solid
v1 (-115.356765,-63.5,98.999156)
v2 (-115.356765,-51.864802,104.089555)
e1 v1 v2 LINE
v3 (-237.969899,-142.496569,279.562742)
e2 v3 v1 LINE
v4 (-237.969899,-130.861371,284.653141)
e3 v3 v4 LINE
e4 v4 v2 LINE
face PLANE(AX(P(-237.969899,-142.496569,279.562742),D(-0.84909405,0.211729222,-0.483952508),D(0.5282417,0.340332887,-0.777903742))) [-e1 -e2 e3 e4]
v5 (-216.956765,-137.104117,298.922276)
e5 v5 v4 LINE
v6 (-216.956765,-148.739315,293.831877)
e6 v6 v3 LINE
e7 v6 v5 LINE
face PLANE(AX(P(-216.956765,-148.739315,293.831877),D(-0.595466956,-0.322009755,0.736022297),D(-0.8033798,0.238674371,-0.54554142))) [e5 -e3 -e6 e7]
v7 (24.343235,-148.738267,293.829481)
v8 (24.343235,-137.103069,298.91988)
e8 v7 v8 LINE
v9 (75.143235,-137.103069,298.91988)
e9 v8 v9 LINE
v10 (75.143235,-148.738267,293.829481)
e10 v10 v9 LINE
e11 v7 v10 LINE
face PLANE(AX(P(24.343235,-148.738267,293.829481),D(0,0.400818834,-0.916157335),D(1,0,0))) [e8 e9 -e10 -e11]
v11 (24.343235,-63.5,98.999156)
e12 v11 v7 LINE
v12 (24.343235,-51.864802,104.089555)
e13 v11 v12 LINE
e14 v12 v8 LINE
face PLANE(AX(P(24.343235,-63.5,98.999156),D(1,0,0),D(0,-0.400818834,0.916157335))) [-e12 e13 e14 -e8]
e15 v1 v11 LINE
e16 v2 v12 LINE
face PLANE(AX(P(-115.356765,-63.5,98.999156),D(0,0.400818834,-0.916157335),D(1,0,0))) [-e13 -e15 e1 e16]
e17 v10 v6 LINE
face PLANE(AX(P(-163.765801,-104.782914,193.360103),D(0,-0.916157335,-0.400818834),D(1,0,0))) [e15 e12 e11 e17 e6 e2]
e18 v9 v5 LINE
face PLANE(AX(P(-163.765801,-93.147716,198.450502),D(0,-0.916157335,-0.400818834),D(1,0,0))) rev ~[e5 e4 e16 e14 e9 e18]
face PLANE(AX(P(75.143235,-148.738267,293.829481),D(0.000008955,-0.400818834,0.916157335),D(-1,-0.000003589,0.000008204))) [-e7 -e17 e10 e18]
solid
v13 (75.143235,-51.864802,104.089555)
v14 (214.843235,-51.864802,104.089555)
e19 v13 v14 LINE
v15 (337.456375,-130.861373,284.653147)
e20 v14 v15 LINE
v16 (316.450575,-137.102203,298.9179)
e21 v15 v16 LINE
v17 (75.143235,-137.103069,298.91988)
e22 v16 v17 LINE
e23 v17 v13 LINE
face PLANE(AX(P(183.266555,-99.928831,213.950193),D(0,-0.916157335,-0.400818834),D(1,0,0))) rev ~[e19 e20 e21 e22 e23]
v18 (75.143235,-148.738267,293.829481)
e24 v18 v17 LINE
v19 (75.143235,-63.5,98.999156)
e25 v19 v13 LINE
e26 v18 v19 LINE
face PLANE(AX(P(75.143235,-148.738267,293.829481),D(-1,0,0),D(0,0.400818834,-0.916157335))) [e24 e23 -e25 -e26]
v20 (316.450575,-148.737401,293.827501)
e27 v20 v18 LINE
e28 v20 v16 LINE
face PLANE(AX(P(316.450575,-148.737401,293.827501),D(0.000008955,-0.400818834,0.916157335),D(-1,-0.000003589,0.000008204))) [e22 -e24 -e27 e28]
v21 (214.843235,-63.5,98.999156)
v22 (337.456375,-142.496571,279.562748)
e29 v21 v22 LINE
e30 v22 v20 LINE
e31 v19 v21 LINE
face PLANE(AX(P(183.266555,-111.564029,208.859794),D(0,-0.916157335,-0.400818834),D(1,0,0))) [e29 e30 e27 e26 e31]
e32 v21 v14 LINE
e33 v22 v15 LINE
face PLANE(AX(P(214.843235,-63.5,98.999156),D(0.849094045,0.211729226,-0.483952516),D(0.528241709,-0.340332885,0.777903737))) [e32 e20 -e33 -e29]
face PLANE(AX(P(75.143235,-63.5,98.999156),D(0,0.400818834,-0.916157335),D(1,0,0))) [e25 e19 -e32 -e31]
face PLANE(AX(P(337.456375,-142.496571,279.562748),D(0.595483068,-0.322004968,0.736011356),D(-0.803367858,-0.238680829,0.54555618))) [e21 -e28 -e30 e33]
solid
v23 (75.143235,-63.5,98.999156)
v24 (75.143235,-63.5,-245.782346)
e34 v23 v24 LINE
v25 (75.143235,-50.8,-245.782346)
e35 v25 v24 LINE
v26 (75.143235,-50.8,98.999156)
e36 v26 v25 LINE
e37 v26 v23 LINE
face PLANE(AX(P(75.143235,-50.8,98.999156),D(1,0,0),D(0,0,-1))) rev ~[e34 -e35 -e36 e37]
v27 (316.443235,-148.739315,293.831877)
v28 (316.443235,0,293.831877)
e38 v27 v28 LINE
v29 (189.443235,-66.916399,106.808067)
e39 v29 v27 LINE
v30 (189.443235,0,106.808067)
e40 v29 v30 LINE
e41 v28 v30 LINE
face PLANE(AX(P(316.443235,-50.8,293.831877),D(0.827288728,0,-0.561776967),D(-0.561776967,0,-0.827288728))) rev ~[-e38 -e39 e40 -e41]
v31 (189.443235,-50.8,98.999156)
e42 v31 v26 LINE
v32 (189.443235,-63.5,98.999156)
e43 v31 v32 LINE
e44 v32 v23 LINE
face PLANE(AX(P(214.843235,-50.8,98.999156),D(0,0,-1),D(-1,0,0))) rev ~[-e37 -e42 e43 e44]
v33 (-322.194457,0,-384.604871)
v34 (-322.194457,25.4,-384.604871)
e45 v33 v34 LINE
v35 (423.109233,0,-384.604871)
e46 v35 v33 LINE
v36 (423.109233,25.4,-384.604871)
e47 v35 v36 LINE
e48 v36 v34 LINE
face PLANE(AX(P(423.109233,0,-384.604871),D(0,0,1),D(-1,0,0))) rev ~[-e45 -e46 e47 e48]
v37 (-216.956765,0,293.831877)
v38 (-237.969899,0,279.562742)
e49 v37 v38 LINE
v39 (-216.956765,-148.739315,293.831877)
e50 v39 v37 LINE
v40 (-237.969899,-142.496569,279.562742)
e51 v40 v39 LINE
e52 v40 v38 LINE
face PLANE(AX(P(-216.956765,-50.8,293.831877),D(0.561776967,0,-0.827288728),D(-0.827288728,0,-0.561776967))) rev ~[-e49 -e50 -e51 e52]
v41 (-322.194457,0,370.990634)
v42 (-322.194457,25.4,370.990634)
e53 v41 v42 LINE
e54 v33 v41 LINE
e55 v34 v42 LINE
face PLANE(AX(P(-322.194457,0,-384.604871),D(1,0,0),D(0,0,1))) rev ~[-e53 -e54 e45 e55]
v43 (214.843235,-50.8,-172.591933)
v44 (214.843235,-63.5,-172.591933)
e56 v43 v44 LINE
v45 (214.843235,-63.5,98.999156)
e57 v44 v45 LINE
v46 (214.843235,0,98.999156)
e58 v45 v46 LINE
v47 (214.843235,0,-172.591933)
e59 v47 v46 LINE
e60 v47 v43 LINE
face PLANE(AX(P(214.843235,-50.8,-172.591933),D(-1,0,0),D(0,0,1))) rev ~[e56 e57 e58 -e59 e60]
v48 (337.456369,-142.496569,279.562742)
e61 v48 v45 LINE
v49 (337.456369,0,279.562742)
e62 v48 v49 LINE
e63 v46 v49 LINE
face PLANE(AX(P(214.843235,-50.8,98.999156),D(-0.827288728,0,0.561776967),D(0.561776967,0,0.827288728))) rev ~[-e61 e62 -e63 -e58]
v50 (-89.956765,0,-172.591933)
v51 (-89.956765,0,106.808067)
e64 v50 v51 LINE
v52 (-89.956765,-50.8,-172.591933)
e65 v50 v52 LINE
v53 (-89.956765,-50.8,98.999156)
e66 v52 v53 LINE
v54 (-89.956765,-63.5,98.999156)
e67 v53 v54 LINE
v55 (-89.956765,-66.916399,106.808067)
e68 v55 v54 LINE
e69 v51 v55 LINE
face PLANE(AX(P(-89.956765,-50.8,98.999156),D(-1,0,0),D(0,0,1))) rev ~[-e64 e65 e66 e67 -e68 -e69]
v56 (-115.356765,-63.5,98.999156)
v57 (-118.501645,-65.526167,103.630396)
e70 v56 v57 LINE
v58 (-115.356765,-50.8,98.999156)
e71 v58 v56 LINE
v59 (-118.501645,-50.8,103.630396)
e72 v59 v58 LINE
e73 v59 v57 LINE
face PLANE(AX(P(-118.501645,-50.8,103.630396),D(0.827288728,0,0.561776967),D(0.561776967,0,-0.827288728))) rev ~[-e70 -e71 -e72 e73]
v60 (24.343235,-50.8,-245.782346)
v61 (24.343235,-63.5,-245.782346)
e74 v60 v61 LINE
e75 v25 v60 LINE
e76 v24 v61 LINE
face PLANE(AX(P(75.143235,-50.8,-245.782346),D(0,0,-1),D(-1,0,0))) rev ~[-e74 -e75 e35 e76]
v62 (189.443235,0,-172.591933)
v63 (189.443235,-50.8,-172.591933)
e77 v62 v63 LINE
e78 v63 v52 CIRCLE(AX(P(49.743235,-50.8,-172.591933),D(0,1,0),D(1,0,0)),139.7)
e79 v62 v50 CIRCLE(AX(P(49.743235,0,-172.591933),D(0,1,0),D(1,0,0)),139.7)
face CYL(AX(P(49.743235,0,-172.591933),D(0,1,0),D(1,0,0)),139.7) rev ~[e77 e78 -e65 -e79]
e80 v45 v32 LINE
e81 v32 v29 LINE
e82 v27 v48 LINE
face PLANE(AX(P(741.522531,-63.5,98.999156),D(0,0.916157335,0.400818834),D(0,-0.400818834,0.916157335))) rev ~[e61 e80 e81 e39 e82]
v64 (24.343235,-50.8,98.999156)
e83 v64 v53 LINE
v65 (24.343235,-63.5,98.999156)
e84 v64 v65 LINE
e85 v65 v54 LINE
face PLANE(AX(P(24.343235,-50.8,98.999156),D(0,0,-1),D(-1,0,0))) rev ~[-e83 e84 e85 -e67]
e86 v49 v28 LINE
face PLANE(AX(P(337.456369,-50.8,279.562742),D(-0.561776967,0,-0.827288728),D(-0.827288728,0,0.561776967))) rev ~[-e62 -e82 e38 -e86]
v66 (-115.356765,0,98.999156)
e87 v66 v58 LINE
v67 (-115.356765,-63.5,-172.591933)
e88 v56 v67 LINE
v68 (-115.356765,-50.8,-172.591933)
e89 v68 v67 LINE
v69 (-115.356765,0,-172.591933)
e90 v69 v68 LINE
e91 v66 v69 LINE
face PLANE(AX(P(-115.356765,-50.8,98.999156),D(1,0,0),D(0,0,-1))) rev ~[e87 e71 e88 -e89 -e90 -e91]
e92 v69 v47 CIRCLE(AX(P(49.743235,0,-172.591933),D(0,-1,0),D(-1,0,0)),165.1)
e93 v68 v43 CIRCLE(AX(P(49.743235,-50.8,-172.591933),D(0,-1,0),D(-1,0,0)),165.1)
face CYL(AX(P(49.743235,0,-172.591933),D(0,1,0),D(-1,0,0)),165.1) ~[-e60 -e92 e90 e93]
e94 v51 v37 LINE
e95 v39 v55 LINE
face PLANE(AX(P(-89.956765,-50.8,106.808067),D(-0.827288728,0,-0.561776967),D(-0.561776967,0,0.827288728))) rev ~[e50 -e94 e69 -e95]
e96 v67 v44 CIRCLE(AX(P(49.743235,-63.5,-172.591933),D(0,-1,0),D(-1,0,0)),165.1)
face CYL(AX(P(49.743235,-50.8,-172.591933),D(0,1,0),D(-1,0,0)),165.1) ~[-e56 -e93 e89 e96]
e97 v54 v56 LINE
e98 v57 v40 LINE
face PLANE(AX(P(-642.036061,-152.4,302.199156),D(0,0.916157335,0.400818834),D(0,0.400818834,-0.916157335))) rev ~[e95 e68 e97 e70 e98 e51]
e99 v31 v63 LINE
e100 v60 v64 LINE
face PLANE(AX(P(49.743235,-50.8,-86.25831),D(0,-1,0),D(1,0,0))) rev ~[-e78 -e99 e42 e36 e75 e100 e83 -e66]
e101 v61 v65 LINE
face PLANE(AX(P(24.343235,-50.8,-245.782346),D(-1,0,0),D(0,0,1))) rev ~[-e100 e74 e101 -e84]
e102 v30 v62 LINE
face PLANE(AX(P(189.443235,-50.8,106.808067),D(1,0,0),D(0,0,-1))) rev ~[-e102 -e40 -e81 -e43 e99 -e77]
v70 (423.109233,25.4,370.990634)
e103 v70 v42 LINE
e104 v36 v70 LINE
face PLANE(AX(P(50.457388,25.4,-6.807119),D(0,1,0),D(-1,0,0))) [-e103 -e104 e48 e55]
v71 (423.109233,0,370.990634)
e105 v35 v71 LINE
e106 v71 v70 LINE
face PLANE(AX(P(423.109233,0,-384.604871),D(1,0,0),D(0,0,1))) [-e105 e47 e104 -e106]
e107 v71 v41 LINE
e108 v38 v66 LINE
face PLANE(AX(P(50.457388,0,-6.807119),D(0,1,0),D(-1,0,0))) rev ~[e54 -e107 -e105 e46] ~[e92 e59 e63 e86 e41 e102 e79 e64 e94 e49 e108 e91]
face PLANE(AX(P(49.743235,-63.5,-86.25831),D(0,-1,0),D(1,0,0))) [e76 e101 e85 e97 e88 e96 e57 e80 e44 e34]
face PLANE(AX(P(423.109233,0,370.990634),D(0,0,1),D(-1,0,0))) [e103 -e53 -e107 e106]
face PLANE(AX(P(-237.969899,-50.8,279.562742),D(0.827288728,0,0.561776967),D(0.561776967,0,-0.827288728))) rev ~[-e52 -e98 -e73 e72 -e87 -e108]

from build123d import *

# Parameters (mm, degrees)
F1_DEPTH     = 50.8
F2_W         = 745.3036904335
F2_H         = 755.5955052376
F3_DEPTH     = 25.4
F5_DEPTH     = 12.7
F7_DEPTH     = 101.6
F8_T4_DEPTH  = 1078.7585913979
F9_DEPTH     = 101.6
F10_T4_DEPTH = 1078.7585913979
F12_DEPTH    = 12.7


# Not quite as in the source:
# - a fillet or chamfer that OpenCascade refuses, or shapes differently, is made with other operations: its cross-section is extruded or revolved along the edge and cut away or added


with BuildPart() as f1:
    # F0 (on Front) → F1 (new body)
    with BuildSketch(Plane.XZ):
        with BuildLine():
            Line((-89.9567651826, 106.8080672332), (-216.9567651826, 293.8318768854))
            Line((-216.9567651826, 293.8318768854), (-237.969898878, 279.5627419326))
            Line((-237.969898878, 279.5627419326), (-216.9567651826, 248.6182040079))
            Line((-216.9567651826, 248.6182040079), (-115.3567651826, 98.9991562862))
            Line((-115.3567651826, 98.9991562862), (-115.3567651826, -172.5919327668))
            ThreePointArc((-115.3567651826, -172.5919327668), (-67.0000946798, -289.3352624173), (49.7432350342, -337.6919327668))
            ThreePointArc((49.7432350342, -337.6919327668), (166.486564468, -289.335262264), (214.8432348174, -172.5919327668))
            Line((214.8432348174, -172.5919327668), (214.8432348174, 98.9991562862))
            Line((214.8432348174, 98.9991562862), (316.4432348174, 248.6182040079))
            Line((316.4432348174, 248.6182040079), (337.4563685128, 279.5627419326))
            Line((337.4563685128, 279.5627419326), (316.4432348174, 293.8318768854))
            Line((316.4432348174, 293.8318768854), (189.4432348174, 106.8080672332))
            Line((189.4432348174, 106.8080672332), (189.4432348174, -172.5919327668))
            ThreePointArc((189.4432348174, -172.5919327668), (49.7432348174, -312.2919327668), (-89.9567651826, -172.5919327668))
            Line((-89.9567651826, -172.5919327668), (-89.9567651826, 106.8080672332))
        make_face()
    extrude(amount=F1_DEPTH)

    # F2 (on face) → F3 (join)
    with BuildSketch(Plane(origin=(0, 0, 0), x_dir=(-1, 0, 0), z_dir=(0, 1, 0))):
        with Locations((-50.4573881626, -6.8071186543)):
            Rectangle(F2_W, F2_H)
        with BuildLine():
            Line((89.9567651826, 106.8080672332), (216.9567651826, 293.8318768854))
            Line((216.9567651826, 293.8318768854), (237.969898878, 279.5627419326))
            Line((237.969898878, 279.5627419326), (115.3567651826, 98.9991562862))
            Line((115.3567651826, 98.9991562862), (115.3567651826, -172.5919327668))
            ThreePointArc((115.3567651826, -172.5919327668), (-49.7432348174, -337.6919327668), (-214.8432348174, -172.5919327668))
            Line((-214.8432348174, -172.5919327668), (-214.8432348174, 98.9991562862))
            Line((-214.8432348174, 98.9991562862), (-337.4563685128, 279.5627419326))
            Line((-337.4563685128, 279.5627419326), (-316.4432348174, 293.8318768854))
            Line((-316.4432348174, 293.8318768854), (-189.4432348174, 106.8080672332))
            Line((-189.4432348174, 106.8080672332), (-189.4432348174, -172.5919327668))
            ThreePointArc((-189.4432348174, -172.5919327668), (-49.7432348174, -312.2919327668), (89.9567651826, -172.5919327668))
            Line((89.9567651826, -172.5919327668), (89.9567651826, 106.8080672332))
        make_face(mode=Mode.SUBTRACT)
        with BuildLine():
            Line((237.969898878, 279.5627419326), (216.9567651826, 293.8318768854))
            Line((216.9567651826, 293.8318768854), (89.9567651826, 106.8080672332))
            Line((89.9567651826, 106.8080672332), (89.9567651826, -172.5919327668))
            ThreePointArc((89.9567651826, -172.5919327668), (-49.7432348174, -312.2919327668), (-189.4432348174, -172.5919327668))
            Line((-189.4432348174, -172.5919327668), (-189.4432348174, 106.8080672332))
            Line((-189.4432348174, 106.8080672332), (-316.4432348174, 293.8318768854))
            Line((-316.4432348174, 293.8318768854), (-337.4563685128, 279.5627419326))
            Line((-337.4563685128, 279.5627419326), (-214.8432348174, 98.9991562862))
            Line((-214.8432348174, 98.9991562862), (-214.8432348174, -172.5919327668))
            ThreePointArc((-214.8432348174, -172.5919327668), (-49.7432348174, -337.6919327668), (115.3567651826, -172.5919327668))
            Line((115.3567651826, -172.5919327668), (115.3567651826, 98.9991562862))
            Line((115.3567651826, 98.9991562862), (237.969898878, 279.5627419326))
        make_face()
    extrude(amount=F3_DEPTH)

    # F4 (on face) → F5 (join)
    with BuildSketch(Plane.XZ.offset(50.8)):
        with BuildLine():
            Line((24.3432348174, 98.9991562862), (-89.9567651826, 98.9991562862))
            Line((-89.9567651826, 98.9991562862), (-89.9567651826, -172.5919327668))
            ThreePointArc((-89.9567651826, -172.5919327668), (49.7432348174, -312.2919327668), (189.4432348174, -172.5919327668))
            Line((189.4432348174, -172.5919327668), (189.4432348174, 98.9991562862))
            Line((189.4432348174, 98.9991562862), (75.1432348174, 98.9991562862))
            Line((75.1432348174, 98.9991562862), (75.1432348174, -172.5919327668))
            Line((75.1432348174, -172.5919327668), (75.1432348174, -245.7823455334))
            Line((75.1432348174, -245.7823455334), (24.3432348174, -245.7823455334))
            Line((24.3432348174, -245.7823455334), (24.3432348174, -172.5919327668))
            Line((24.3432348174, -172.5919327668), (24.3432348174, 98.9991562862))
        make_face()
        with BuildLine():
            Line((-89.9567651826, -172.5919327668), (-89.9567651826, 98.9991562862))
            Line((-89.9567651826, 98.9991562862), (-115.3567651826, 98.9991562862))
            Line((-115.3567651826, 98.9991562862), (-115.3567651826, -172.5919327668))
            ThreePointArc((-115.3567651826, -172.5919327668), (49.7432348174, -337.6919327668), (214.8432348174, -172.5919327668))
            Line((214.8432348174, -172.5919327668), (214.8432348174, 98.9991562862))
            Line((214.8432348174, 98.9991562862), (189.4432348174, 98.9991562862))
            Line((189.4432348174, 98.9991562862), (189.4432348174, -172.5919327668))
            ThreePointArc((189.4432348174, -172.5919327668), (49.7432348174, -312.2919327668), (-89.9567651826, -172.5919327668))
        make_face()
    extrude(amount=F5_DEPTH)

    # F6 (on face) → F7 (join)
    with BuildSketch(Plane.XZ.offset(50.8)):
        Polygon((-118.501645235, 103.6303960366), (-115.3567651826, 98.9991562862), (-89.9567651826, 98.9991562862), (-89.9567651826, 106.8080672332), (-216.9567651826, 293.8318768854), (-237.969898878, 279.5627419326), align=None)
    extrude(amount=F7_DEPTH)

    # F8: chamfer of 88.9 x 203.2 on 1 edges, made by hand


with BuildPart() as f8_tool2:
    # F8_s3 → F8_t4 (new body)
    with BuildSketch(Plane.YZ.offset(-642.0360608816)):
        Polygon((-152.4, 302.1991562862), (-63.5, 98.9991562862), (-152.4, 98.9991562862), align=None)
    extrude(amount=F8_T4_DEPTH)

    split(bisect_by=Plane.XZ.offset(63.5), keep=Keep.TOP)


with BuildPart() as f1_1:
    add(f1.part)

    # F8_t1: cut F8_tool2
    add(f8_tool2.part, mode=Mode.SUBTRACT)

    # F9 (add): a face of the model
    f9_faces = [f1_1.faces().sort_by_distance(p)[0] for p in [
        (263.3288281635, -50.8, 193.2225963664),
    ]]
    extrude(f9_faces, amount=F9_DEPTH)

    # F10: chamfer of 203.2 x 88.9 on 1 edges, made by hand


with BuildPart() as f10_tool2:
    # F10_s3 → F10_t4 (new body)
    with BuildSketch(Plane.YZ.offset(741.5225305163)):
        Polygon((-63.5, 98.9991562862), (-152.4, 302.1991562862), (-152.4, 98.9991562862), align=None)
    extrude(amount=-F10_T4_DEPTH)

    split(bisect_by=Plane.XZ.offset(63.5), keep=Keep.TOP)


with BuildPart() as f1_2:
    add(f1_1.part)

    # F10_t1: cut F10_tool2
    add(f10_tool2.part, mode=Mode.SUBTRACT)


with BuildPart() as f12:
    # F11 (on face) → F12 (new body)
    with BuildSketch(Plane(origin=(0, -16.9445721179, -7.4132503016), x_dir=(1, 0, 0), z_dir=(0, -0.9161573349, -0.400818834))):
        Polygon((-237.969898878, 313.2387651133), (-115.3567651826, 116.150799141), (-89.9567651826, 116.150799141), (-89.9567651826, 124.6743470618), (-216.9567651826, 328.8137481529), align=None)
        Polygon((-89.9567651826, 124.6743470618), (-89.9567651826, 116.150799141), (24.3432348174, 116.150799141), (24.3432348174, 328.8111325348), (75.1432348174, 328.8111325348), (-216.9567651826, 328.8137481529), align=None)
    extrude(amount=-F12_DEPTH)


with BuildPart() as f12b:
    # F11 (on face) → F12, piece 2 (new body)
    with BuildSketch(Plane(origin=(0, -16.9445721179, -7.4132503016), x_dir=(1, 0, 0), z_dir=(0, -0.9161573349, -0.400818834))):
        Polygon((75.1432348174, 328.8111325348), (75.1432348174, 116.150799141), (214.8432348174, 116.150799141), (337.4563754174, 313.238771741), (316.4505754174, 328.808971741), align=None)
    extrude(amount=-F12_DEPTH)


solid = Compound([f1_2.part, f12.part, f12b.part])
